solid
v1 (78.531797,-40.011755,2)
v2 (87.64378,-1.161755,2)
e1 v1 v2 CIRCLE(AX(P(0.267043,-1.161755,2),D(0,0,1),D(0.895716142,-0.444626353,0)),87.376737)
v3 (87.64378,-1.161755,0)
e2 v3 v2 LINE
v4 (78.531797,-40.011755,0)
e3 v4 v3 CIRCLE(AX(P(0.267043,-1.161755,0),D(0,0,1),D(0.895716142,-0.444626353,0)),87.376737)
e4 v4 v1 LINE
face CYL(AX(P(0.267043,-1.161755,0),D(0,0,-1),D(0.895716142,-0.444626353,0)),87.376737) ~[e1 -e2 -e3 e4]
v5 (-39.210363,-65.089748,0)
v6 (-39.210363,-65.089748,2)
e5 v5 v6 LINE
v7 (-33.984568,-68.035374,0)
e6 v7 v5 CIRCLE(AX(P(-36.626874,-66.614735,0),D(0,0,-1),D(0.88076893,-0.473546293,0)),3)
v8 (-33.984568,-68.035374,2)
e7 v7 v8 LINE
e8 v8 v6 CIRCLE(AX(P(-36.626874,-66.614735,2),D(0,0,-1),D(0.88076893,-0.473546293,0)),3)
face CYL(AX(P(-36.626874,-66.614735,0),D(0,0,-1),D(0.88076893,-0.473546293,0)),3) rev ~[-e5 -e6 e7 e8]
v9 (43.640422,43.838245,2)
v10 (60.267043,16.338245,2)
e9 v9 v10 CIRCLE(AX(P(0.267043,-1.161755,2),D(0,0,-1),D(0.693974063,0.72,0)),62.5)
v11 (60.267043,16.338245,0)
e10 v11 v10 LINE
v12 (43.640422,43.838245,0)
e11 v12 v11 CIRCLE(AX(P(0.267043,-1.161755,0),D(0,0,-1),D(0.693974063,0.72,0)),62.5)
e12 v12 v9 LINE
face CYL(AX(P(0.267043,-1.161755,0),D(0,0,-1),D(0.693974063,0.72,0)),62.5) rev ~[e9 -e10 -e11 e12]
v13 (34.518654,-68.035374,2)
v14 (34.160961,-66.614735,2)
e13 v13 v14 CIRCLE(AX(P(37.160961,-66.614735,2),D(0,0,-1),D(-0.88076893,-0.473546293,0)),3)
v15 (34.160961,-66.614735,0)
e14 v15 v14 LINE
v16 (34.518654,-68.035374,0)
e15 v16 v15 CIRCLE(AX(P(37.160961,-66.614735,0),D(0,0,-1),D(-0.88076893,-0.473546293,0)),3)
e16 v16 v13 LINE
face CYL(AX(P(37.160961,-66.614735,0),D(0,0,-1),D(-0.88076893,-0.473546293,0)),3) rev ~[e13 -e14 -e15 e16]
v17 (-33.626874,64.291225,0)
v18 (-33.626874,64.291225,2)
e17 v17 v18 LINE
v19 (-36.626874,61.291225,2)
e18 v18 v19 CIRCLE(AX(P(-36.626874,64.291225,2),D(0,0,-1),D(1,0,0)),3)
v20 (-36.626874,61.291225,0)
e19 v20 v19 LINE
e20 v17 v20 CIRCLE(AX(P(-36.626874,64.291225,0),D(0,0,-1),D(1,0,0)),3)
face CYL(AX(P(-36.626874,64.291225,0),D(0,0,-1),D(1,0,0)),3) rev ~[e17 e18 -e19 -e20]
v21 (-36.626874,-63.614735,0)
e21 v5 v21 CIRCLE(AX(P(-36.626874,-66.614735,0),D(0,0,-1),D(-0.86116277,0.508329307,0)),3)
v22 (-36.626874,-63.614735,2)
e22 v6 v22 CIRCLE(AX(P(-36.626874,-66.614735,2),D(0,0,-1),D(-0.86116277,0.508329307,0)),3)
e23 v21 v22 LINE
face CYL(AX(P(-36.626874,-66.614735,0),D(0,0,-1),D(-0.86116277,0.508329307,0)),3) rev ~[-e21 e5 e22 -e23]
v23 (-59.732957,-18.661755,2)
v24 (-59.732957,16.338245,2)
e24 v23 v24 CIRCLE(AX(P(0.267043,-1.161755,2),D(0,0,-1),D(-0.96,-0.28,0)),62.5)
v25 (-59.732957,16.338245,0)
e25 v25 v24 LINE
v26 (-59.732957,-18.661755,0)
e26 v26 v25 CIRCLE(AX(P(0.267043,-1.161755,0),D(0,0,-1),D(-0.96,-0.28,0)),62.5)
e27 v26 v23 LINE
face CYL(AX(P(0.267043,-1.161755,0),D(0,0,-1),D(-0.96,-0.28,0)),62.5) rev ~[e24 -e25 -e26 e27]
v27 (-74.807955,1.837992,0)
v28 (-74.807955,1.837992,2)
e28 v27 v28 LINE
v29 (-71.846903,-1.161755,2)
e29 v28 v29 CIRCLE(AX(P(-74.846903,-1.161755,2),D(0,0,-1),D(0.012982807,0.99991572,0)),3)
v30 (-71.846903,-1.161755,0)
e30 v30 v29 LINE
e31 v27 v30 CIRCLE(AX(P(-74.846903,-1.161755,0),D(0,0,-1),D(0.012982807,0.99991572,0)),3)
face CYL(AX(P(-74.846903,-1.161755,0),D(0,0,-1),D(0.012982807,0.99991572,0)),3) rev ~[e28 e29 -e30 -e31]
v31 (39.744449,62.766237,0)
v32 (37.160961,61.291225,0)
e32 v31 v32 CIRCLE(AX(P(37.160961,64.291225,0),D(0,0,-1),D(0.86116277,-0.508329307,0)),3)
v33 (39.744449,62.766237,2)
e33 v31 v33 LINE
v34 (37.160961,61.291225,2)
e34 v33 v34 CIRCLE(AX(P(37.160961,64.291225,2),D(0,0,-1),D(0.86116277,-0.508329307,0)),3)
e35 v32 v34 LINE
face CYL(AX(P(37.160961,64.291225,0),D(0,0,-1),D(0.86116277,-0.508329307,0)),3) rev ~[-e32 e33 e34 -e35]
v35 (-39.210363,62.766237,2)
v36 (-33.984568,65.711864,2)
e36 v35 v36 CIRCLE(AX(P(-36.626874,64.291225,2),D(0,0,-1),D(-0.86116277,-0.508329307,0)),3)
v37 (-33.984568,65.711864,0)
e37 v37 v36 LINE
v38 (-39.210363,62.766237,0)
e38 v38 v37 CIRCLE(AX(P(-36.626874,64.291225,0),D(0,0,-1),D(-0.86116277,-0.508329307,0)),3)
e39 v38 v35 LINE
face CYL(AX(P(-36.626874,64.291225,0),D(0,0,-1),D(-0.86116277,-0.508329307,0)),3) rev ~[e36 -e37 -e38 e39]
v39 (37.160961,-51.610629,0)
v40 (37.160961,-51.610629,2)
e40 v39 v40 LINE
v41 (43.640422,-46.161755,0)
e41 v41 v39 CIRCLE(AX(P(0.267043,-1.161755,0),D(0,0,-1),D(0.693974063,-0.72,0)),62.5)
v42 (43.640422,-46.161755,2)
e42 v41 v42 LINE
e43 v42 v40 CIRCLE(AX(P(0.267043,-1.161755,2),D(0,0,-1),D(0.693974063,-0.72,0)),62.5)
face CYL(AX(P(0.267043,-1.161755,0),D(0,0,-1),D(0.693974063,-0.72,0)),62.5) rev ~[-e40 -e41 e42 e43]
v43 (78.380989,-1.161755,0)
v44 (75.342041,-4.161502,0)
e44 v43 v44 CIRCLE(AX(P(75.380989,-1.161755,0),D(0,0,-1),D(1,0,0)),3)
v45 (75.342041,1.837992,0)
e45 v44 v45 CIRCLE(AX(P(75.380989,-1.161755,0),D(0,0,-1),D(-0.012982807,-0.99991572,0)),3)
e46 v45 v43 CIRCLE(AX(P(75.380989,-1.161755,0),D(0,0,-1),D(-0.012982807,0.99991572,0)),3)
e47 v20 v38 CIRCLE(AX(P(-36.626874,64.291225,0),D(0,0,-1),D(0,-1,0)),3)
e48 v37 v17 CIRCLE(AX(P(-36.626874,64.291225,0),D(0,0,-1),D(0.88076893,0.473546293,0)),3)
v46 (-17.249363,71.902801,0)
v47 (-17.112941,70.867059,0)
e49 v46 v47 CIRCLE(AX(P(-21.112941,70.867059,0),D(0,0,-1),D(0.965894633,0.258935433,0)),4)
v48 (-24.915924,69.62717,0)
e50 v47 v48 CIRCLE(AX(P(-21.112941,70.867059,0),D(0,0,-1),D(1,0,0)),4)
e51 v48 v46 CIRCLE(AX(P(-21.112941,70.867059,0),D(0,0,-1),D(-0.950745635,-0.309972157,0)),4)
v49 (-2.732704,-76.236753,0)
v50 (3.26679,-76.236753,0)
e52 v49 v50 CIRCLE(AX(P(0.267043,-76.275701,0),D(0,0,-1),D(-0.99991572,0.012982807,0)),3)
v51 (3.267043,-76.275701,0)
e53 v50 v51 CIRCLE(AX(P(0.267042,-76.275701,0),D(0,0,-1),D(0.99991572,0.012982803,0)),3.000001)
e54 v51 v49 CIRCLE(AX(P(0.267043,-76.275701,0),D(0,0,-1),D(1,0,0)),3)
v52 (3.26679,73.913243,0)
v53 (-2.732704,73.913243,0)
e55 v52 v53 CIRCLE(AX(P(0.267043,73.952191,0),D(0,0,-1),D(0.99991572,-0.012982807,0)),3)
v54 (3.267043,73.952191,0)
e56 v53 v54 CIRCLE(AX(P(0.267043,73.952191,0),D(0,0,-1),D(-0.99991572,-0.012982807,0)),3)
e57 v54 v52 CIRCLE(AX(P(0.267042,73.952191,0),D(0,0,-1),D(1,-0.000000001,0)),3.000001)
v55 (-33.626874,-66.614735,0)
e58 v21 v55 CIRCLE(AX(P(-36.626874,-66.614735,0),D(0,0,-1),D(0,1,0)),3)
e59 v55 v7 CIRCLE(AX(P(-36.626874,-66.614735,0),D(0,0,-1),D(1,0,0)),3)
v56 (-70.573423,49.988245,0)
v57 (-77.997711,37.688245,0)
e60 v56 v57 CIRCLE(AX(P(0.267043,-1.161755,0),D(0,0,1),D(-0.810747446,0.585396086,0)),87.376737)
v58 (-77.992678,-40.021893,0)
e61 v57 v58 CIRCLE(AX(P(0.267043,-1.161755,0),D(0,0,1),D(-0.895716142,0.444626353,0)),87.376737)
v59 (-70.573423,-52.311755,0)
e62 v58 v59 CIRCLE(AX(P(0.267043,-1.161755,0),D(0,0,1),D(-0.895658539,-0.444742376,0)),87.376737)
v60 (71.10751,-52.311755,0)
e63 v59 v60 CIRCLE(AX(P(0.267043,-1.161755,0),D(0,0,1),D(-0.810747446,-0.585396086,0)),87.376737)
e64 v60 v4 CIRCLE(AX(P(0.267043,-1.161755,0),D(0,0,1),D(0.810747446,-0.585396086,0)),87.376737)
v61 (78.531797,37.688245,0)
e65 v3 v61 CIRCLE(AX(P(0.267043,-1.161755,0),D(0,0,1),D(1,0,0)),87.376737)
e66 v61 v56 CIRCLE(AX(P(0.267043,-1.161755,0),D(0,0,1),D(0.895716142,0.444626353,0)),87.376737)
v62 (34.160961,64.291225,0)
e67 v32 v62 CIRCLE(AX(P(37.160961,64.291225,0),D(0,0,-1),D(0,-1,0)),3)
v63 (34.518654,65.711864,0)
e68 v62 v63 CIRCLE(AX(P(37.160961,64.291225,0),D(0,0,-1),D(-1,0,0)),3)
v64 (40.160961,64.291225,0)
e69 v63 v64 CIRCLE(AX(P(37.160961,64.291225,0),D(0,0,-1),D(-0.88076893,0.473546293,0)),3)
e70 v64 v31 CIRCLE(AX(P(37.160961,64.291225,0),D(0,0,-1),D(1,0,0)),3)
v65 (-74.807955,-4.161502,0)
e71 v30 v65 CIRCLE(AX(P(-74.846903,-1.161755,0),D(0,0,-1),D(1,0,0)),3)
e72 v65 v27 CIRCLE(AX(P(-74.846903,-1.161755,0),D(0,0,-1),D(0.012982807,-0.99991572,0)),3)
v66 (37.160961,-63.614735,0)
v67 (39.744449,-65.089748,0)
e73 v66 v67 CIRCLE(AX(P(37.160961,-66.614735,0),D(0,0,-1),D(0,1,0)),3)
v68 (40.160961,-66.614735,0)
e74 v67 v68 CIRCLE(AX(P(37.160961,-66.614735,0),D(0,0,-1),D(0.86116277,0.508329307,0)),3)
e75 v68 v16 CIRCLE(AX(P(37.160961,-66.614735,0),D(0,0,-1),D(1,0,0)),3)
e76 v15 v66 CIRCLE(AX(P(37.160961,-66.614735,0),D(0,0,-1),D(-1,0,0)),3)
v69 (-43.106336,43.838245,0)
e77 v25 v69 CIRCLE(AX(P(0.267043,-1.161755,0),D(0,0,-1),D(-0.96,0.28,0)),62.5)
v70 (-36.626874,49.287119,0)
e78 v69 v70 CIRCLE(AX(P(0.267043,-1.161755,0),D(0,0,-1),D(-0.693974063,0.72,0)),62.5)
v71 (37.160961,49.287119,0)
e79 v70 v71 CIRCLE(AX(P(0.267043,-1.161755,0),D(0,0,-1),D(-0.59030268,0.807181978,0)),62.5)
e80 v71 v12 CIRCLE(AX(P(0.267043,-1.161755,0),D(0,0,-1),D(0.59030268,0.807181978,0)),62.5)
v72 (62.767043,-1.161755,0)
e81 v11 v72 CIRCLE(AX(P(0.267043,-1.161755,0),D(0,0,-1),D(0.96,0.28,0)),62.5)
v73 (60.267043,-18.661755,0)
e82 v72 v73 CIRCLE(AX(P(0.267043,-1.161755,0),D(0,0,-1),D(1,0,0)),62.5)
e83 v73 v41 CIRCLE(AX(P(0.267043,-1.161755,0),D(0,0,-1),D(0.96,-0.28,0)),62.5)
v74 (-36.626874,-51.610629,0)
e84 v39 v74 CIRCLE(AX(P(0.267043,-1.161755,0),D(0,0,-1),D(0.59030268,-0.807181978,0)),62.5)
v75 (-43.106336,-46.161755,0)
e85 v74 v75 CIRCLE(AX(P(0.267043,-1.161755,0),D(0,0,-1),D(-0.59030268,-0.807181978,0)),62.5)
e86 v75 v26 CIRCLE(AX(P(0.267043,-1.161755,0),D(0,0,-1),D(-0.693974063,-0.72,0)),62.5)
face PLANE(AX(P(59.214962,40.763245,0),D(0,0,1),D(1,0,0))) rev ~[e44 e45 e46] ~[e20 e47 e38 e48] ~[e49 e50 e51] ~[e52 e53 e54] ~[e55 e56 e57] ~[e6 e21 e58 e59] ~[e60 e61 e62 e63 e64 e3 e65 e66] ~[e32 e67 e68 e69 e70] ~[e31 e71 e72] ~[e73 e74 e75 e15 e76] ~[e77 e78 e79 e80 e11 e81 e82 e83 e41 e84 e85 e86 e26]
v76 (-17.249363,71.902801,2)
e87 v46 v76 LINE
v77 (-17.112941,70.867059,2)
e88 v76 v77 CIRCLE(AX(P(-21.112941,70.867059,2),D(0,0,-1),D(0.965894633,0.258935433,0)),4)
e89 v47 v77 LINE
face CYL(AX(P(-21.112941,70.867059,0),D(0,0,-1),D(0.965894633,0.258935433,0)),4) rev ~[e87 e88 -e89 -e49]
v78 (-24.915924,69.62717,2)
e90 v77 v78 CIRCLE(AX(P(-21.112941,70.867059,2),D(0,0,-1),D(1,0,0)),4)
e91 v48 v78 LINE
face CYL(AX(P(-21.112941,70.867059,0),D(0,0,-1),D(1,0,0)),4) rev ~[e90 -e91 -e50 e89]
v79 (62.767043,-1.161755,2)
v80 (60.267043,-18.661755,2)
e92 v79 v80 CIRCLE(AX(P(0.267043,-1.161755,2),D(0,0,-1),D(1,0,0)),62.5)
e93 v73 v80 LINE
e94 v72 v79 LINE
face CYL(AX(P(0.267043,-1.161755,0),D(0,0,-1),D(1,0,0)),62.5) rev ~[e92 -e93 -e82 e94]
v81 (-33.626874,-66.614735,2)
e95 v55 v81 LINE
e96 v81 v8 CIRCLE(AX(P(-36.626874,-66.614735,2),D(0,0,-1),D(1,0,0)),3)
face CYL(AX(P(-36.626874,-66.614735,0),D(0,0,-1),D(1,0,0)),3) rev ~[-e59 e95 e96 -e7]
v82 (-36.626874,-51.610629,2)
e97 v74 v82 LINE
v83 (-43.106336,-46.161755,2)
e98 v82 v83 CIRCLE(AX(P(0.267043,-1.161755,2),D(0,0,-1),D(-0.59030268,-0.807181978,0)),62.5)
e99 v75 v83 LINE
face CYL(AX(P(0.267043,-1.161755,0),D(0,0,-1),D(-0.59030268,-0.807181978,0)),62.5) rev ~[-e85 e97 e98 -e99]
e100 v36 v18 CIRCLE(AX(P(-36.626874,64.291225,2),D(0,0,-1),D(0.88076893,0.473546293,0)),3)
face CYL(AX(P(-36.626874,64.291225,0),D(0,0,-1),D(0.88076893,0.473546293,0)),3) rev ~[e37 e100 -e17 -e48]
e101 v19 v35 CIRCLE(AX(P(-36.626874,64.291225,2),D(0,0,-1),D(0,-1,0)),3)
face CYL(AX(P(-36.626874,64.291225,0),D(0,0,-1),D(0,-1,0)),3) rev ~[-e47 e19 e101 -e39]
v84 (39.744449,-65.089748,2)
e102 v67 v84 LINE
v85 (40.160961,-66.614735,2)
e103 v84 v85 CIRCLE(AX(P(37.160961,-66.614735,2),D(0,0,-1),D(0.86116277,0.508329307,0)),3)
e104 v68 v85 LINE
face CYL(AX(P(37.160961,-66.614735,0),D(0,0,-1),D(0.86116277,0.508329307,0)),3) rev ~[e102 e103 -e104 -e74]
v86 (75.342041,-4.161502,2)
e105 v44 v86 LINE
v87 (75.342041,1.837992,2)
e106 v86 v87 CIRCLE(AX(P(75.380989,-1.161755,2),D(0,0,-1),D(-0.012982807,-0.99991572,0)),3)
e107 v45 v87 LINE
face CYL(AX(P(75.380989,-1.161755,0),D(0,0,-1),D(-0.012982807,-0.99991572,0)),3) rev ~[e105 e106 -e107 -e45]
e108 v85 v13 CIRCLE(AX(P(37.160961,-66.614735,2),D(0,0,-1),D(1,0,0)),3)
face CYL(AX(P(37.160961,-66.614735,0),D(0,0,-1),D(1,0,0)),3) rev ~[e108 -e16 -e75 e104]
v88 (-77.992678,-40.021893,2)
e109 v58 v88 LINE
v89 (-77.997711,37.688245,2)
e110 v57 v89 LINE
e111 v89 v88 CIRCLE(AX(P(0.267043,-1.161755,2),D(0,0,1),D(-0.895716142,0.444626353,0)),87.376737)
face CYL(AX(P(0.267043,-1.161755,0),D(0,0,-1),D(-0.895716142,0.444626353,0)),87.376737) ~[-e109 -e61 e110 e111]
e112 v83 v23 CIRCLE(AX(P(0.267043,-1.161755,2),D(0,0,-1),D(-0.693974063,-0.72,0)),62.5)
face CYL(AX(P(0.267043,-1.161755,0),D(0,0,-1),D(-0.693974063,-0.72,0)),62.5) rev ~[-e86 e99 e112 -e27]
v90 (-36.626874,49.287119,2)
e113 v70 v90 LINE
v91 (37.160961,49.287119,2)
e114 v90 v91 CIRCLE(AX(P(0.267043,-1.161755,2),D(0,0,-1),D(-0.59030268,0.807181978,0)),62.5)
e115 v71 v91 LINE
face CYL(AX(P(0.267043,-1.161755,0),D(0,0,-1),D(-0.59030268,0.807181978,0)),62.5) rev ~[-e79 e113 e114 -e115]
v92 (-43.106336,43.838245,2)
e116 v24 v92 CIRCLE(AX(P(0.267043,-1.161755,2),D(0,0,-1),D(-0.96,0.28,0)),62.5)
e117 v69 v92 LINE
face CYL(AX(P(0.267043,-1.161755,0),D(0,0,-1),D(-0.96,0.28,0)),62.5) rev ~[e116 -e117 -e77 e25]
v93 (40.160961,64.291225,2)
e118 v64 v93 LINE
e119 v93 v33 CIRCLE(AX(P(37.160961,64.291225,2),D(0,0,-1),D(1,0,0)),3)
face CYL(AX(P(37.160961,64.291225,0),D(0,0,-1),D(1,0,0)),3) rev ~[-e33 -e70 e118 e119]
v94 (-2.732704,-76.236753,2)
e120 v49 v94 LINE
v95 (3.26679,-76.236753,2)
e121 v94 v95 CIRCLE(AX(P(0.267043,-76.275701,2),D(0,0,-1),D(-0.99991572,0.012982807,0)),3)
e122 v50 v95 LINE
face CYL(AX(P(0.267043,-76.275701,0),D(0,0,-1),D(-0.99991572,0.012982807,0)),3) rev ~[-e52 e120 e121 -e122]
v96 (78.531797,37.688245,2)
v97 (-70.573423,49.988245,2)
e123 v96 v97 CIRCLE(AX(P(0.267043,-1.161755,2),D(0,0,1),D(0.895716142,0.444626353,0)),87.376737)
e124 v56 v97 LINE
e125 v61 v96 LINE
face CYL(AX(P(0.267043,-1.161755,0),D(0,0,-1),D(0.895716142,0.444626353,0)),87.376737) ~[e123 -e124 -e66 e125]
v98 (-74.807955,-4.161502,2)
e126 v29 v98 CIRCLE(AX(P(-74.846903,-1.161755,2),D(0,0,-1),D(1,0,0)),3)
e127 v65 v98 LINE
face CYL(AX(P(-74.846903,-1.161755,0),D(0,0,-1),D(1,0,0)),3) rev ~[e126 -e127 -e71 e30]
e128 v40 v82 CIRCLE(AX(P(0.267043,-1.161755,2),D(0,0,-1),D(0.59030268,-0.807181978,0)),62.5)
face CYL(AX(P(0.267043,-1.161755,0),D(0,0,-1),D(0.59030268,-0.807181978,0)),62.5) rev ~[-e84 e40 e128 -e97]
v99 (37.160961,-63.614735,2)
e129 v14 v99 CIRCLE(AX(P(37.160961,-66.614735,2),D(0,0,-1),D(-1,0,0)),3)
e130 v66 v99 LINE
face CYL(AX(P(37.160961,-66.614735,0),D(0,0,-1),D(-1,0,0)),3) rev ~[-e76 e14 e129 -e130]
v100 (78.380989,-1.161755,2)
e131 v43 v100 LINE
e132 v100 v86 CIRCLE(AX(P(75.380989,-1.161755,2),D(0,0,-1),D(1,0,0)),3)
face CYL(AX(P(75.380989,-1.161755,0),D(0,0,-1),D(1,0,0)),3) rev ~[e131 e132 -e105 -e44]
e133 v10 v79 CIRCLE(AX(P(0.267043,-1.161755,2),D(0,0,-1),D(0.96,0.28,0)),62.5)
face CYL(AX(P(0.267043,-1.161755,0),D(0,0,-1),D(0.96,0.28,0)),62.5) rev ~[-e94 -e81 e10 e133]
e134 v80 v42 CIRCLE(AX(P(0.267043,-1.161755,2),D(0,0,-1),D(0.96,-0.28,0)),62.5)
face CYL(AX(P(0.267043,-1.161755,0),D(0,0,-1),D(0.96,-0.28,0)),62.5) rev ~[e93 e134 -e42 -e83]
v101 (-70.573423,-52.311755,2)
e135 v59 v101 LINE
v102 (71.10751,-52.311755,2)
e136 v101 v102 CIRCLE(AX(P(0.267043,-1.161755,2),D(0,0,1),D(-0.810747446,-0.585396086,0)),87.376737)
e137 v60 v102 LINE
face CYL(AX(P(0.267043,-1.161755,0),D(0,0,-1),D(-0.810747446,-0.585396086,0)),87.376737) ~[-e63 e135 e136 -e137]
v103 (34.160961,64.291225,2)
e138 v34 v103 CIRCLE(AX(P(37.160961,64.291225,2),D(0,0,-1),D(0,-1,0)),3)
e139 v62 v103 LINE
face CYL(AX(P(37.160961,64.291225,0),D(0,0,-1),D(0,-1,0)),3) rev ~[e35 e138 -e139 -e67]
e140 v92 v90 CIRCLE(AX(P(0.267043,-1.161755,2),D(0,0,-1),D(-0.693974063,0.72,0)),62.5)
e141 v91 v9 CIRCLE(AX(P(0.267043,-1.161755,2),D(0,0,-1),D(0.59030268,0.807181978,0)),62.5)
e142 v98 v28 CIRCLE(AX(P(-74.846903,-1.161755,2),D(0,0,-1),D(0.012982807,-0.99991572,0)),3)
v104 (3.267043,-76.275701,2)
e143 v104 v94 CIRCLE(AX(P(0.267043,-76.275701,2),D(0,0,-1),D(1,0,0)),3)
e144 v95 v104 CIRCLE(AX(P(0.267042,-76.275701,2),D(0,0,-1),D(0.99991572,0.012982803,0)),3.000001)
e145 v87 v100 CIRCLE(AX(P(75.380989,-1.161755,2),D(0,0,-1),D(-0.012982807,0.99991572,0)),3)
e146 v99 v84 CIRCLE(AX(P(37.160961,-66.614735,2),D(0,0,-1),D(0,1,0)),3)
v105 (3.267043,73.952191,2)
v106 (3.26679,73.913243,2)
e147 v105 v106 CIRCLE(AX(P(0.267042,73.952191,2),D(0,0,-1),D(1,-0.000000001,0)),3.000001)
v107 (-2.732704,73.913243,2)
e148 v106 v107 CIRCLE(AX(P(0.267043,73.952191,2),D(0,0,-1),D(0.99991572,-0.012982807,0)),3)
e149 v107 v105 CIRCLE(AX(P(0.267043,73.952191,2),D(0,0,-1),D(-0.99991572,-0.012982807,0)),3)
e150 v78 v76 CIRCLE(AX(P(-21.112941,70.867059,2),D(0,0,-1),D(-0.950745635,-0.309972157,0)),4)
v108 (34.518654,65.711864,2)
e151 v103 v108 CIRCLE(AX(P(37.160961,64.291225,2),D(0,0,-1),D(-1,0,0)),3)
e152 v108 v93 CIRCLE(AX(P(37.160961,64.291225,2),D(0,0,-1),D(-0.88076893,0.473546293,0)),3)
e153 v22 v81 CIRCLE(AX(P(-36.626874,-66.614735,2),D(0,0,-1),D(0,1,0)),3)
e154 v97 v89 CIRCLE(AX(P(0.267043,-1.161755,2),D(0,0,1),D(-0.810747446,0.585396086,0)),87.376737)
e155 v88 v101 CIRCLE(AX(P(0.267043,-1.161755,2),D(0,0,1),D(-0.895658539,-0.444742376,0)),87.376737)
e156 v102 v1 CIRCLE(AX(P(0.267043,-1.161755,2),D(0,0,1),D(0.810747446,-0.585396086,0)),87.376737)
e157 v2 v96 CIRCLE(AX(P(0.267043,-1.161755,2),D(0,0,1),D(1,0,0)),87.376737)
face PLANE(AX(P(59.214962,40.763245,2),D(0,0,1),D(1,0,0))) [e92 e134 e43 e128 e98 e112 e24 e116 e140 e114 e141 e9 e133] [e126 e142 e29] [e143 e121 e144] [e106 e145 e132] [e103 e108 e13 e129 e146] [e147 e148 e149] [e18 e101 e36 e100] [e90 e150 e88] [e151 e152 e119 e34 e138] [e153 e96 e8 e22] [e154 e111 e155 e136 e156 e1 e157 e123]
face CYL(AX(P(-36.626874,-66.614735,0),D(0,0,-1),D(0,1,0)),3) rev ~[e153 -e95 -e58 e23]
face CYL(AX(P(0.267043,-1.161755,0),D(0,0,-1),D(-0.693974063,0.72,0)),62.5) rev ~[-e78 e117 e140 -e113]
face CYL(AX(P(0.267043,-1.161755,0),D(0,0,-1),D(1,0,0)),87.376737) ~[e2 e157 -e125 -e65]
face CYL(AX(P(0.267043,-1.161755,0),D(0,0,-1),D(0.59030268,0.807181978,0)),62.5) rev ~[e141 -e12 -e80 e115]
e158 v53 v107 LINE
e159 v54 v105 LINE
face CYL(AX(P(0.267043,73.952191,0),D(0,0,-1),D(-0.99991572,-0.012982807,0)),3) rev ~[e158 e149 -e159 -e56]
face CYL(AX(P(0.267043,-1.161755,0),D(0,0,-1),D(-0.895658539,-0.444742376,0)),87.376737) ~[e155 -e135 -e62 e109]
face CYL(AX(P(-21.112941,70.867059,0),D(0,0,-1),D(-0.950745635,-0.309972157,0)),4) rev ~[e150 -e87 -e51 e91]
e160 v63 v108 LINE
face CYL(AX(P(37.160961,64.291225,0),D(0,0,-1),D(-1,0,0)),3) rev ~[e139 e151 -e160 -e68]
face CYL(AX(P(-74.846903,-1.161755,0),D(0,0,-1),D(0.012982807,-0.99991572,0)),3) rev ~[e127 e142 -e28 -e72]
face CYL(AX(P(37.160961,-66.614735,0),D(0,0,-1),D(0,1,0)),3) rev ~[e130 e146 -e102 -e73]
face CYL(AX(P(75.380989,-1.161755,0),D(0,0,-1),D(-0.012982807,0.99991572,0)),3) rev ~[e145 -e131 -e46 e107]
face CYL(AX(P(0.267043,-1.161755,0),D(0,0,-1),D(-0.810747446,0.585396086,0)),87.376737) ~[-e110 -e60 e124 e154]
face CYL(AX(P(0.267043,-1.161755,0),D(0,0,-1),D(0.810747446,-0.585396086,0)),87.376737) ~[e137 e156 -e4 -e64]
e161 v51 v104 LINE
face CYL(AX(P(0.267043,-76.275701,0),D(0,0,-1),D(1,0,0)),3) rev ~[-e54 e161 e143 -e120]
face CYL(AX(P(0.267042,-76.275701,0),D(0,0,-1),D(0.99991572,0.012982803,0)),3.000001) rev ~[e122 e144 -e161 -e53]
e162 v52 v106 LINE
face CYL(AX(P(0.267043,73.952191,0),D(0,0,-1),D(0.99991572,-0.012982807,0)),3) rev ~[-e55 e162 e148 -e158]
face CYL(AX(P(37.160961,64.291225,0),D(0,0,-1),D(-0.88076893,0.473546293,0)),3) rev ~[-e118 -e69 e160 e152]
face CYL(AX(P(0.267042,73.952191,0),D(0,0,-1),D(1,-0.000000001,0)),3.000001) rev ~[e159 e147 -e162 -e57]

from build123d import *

# Parameters (mm, degrees)
F0_W     = 2.1041625413
F0_H     = 6.15
F1_DEPTH = 2


# Not quite as in the source:
# - a feature names something its author has since deleted; it is built from what else it names


with BuildPart() as f1:
    # F0 (on Top) → F1 (new body)
    with BuildSketch(Plane.XY):
        with Locations((59.2149618303, 40.7632449339)):
            Rectangle(F0_W, F0_H)
        with BuildLine():
            Line((58.1628805597, 43.8382449339), (60.2670431009, 43.8382449339))
            Line((60.2670431009, 43.8382449339), (60.2670431009, 37.6882449339))
            Line((60.2670431009, 37.6882449339), (62.3712056422, 37.6882449339))
            Line((62.3712056422, 37.6882449339), (62.3712056422, 41.1268579364))
            ThreePointArc((62.3712056422, 41.1268579364), (60.3323424952, 43.9759631228), (58.1628805597, 46.7269262644))
            Line((58.1628805597, 46.7269262644), (58.1628805597, 43.8382449339))
        make_face()
        with BuildLine():
            Line((58.1628805597, 37.6882449339), (58.1628805597, 43.8382449339))
            Line((58.1628805597, 43.8382449339), (53.7670431009, 43.8382449339))
            ThreePointArc((53.7670431009, 43.8382449339), (54.9789878574, 40.0585000032), (58.1628805597, 37.6882449339))
        make_face()
        with BuildLine():
            Line((53.7670431009, 43.8382449339), (58.1628805597, 43.8382449339))
            Line((58.1628805597, 43.8382449339), (58.1628805597, 46.7269262644))
            ThreePointArc((58.1628805597, 46.7269262644), (57.217639487, 47.8472580426), (56.25072261, 48.9489366399))
            ThreePointArc((56.25072261, 48.9489366399), (54.4208441995, 46.6793641507), (53.7670431009, 43.8382449339))
        make_face()
        with BuildLine():
            Line((62.3712056422, 37.6882449339), (60.2670431009, 37.6882449339))
            Line((60.2670431009, 37.6882449339), (60.2670431009, 37.3382449339))
            ThreePointArc((60.2670431009, 37.3382449339), (61.3335795513, 37.4263419402), (62.3712056422, 37.6882449339))
        make_face()
        with BuildLine():
            Line((60.2670431009, 37.3382449339), (60.2670431009, 37.6882449339))
            Line((60.2670431009, 37.6882449339), (58.1628805597, 37.6882449339))
            ThreePointArc((58.1628805597, 37.6882449339), (59.2005066506, 37.4263419402), (60.2670431009, 37.3382449339))
        make_face()
        with BuildLine():
            ThreePointArc((58.1628805597, 37.6882449339), (54.9789878574, 40.0585000032), (53.7670431009, 43.8382449339))
            Line((53.7670431009, 43.8382449339), (43.6404220332, 43.8382449339))
            ThreePointArc((43.6404220332, 43.8382449339), (53.7513993929, 31.1751222109), (60.2670431009, 16.3382449339))
            Line((60.2670431009, 16.3382449339), (60.2670431009, 37.3382449339))
            ThreePointArc((60.2670431009, 37.3382449339), (59.2005066506, 37.4263419402), (58.1628805597, 37.6882449339))
        make_face()
        with BuildLine():
            Line((43.6404220332, 43.8382449339), (53.7670431009, 43.8382449339))
            ThreePointArc((53.7670431009, 43.8382449339), (54.4208441995, 46.6793641507), (56.25072261, 48.9489366399))
            ThreePointArc((56.25072261, 48.9489366399), (48.4949826486, 56.4517818988), (39.7444489138, 62.7662374325))
            ThreePointArc((39.7444489138, 62.7662374325), (38.6484141737, 61.6859457367), (37.1609606052, 61.2912253535))
            Line((37.1609606052, 61.2912253535), (37.1609606052, 49.2871185703))
            ThreePointArc((37.1609606052, 49.2871185703), (40.4930580078, 46.6725184699), (43.6404220332, 43.8382449339))
        make_face()
        with BuildLine():
            ThreePointArc((56.25072261, 48.9489366399), (57.217639487, 47.8472580426), (58.1628805597, 46.7269262644))
            Line((58.1628805597, 46.7269262644), (58.1628805597, 49.9882449339))
            ThreePointArc((58.1628805597, 49.9882449339), (57.1629943627, 49.5491889391), (56.25072261, 48.9489366399))
        make_face()
        with BuildLine():
            Line((58.1628805597, 49.9882449339), (58.1628805597, 46.7269262644))
            ThreePointArc((58.1628805597, 46.7269262644), (60.3323424952, 43.9759631228), (62.3712056422, 41.1268579364))
            Line((62.3712056422, 41.1268579364), (62.3712056422, 49.9882449339))
            Line((62.3712056422, 49.9882449339), (58.1628805597, 49.9882449339))
        make_face()
        with BuildLine():
            ThreePointArc((62.3712056422, 37.6882449339), (61.3335795513, 37.4263419402), (60.2670431009, 37.3382449339))
            Line((60.2670431009, 37.3382449339), (60.2670431009, 16.3382449339))
            ThreePointArc((60.2670431009, 16.3382449339), (62.1388864548, 7.6770796987), (62.7670431009, -1.1617550661))
            ThreePointArc((62.7670431009, -1.1617550661), (62.1388864548, -10.000589831), (60.2670431009, -18.6617550661))
            Line((60.2670431009, -18.6617550661), (60.2670431009, -39.6617550661))
            ThreePointArc((60.2670431009, -39.6617550661), (61.3335795513, -39.7498520725), (62.3712056422, -40.0117550661))
            Line((62.3712056422, -40.0117550661), (64.5782497031, -40.0117550661))
            ThreePointArc((64.5782497031, -40.0117550661), (72.228412317, -22.7676601657), (75.3420410137, -4.1615022256))
            ThreePointArc((75.3420410137, -4.1615022256), (72.3809894341, -1.1617550661), (75.3420410137, 1.8379920933))
            ThreePointArc((75.3420410137, 1.8379920933), (72.228412317, 20.4441500334), (64.5782497031, 37.6882449339))
            Line((64.5782497031, 37.6882449339), (62.3712056422, 37.6882449339))
        make_face()
        with BuildLine():
            Line((62.3712056422, 41.1268579364), (62.3712056422, 37.6882449339))
            ThreePointArc((62.3712056422, 37.6882449339), (63.2414617158, 38.0587264501), (64.0487374012, 38.5515835849))
            ThreePointArc((64.0487374012, 38.5515835849), (63.2231408809, 39.8477992712), (62.3712056422, 41.1268579364))
        make_face()
        with BuildLine():
            ThreePointArc((64.0487374012, 38.5515835849), (63.2414617158, 38.0587264501), (62.3712056422, 37.6882449339))
            Line((62.3712056422, 37.6882449339), (64.5782497031, 37.6882449339))
            ThreePointArc((64.5782497031, 37.6882449339), (64.3149482486, 38.1208064697), (64.0487374012, 38.5515835849))
        make_face()
        with BuildLine():
            ThreePointArc((39.7444489138, 62.7662374325), (48.4949826486, 56.4517818988), (56.25072261, 48.9489366399))
            ThreePointArc((56.25072261, 48.9489366399), (57.1629943627, 49.5491889391), (58.1628805597, 49.9882449339))
            ThreePointArc((58.1628805597, 49.9882449339), (60.2670431009, 50.3382449339), (62.3712056422, 49.9882449339))
            Line((62.3712056422, 49.9882449339), (71.1075096636, 49.9882449339))
            ThreePointArc((71.1075096636, 49.9882449339), (0.2670431009, 86.2149821287), (-70.5734234617, 49.9882449339))
            Line((-70.5734234617, 49.9882449339), (-61.8371194403, 49.9882449339))
            ThreePointArc((-61.8371194403, 49.9882449339), (-59.7329568991, 50.3382449339), (-57.6287943578, 49.9882449339))
            ThreePointArc((-57.6287943578, 49.9882449339), (-56.6289081608, 49.5491889391), (-55.7166364081, 48.9489366399))
            ThreePointArc((-55.7166364081, 48.9489366399), (-47.9608964467, 56.4517818988), (-39.210362712, 62.7662374325))
            ThreePointArc((-39.210362712, 62.7662374325), (-38.0999813971, 66.9046437634), (-33.9845676129, 65.7118642328))
            ThreePointArc((-33.9845676129, 65.7118642328), (-29.5146570092, 67.8187069008), (-24.9159238599, 69.6271704072))
            ThreePointArc((-24.9159238599, 69.6271704072), (-22.2511598208, 74.7016983457), (-17.2493627904, 71.9028007682))
            ThreePointArc((-17.2493627904, 71.9028007682), (-10.040168129, 73.2628053376), (-2.7327040585, 73.9132428466))
            ThreePointArc((-2.7327040585, 73.9132428466), (0.2475684804, 76.9521280563), (3.2670431009, 73.9521912671))
            ThreePointArc((3.2670431009, 73.9521912671), (3.2669798901, 73.9327166465), (3.2667902604, 73.9132428466))
            ThreePointArc((3.2667902604, 73.9132428466), (19.3387910188, 71.5123271502), (34.5186538148, 65.7118642328))
            ThreePointArc((34.5186538148, 65.7118642328), (37.8934493863, 67.2004280253), (40.1609606052, 64.2912253535))
            ThreePointArc((40.1609606052, 64.2912253535), (40.0549599941, 63.5008029746), (39.7444489138, 62.7662374325))
        make_face()
        with BuildLine():
            ThreePointArc((62.3712056422, 49.9882449339), (60.2670431009, 50.3382449339), (58.1628805597, 49.9882449339))
            Line((58.1628805597, 49.9882449339), (62.3712056422, 49.9882449339))
        make_face()
        with BuildLine():
            Line((62.3712056422, 49.9882449339), (62.3712056422, 41.1268579364))
            ThreePointArc((62.3712056422, 41.1268579364), (63.2231408809, 39.8477992712), (64.0487374012, 38.5515835849))
            ThreePointArc((64.0487374012, 38.5515835849), (66.0476578153, 40.8659573428), (66.7670431009, 43.8382449339))
            ThreePointArc((66.7670431009, 43.8382449339), (65.5550983445, 47.6179898645), (62.3712056422, 49.9882449339))
        make_face()
        with BuildLine():
            ThreePointArc((66.7670431009, 43.8382449339), (66.0476578153, 40.8659573428), (64.0487374012, 38.5515835849))
            ThreePointArc((64.0487374012, 38.5515835849), (64.3149482486, 38.1208064697), (64.5782497031, 37.6882449339))
            Line((64.5782497031, 37.6882449339), (78.5317969996, 37.6882449339))
            ThreePointArc((78.5317969996, 37.6882449339), (75.0728864035, 43.9910965671), (71.1075096636, 49.9882449339))
            Line((71.1075096636, 49.9882449339), (62.3712056422, 49.9882449339))
            ThreePointArc((62.3712056422, 49.9882449339), (65.5550983445, 47.6179898645), (66.7670431009, 43.8382449339))
        make_face()
        with BuildLine():
            Line((78.5317969996, 37.6882449339), (64.5782497031, 37.6882449339))
            ThreePointArc((64.5782497031, 37.6882449339), (72.228412317, 20.4441500334), (75.3420410137, 1.8379920933))
            ThreePointArc((75.3420410137, 1.8379920933), (77.4884944447, 0.9732912169), (78.3809894341, -1.1617550661))
            ThreePointArc((78.3809894341, -1.1617550661), (77.4884944447, -3.2968013492), (75.3420410137, -4.1615022256))
            ThreePointArc((75.3420410137, -4.1615022256), (72.228412317, -22.7676601657), (64.5782497031, -40.0117550661))
            Line((64.5782497031, -40.0117550661), (78.5317969996, -40.0117550661))
            ThreePointArc((78.5317969996, -40.0117550661), (85.3352893384, -21.1138899118), (87.6437802958, -1.1617550661))
            ThreePointArc((87.6437802958, -1.1617550661), (85.3352893384, 18.7903797795), (78.5317969996, 37.6882449339))
        make_face()
        with BuildLine():
            ThreePointArc((-36.6268744033, 49.2871185703), (0.2670431009, 61.3382449339), (37.1609606052, 49.2871185703))
            Line((37.1609606052, 49.2871185703), (37.1609606052, 61.2912253535))
            ThreePointArc((37.1609606052, 61.2912253535), (35.0396402617, 62.1699050099), (34.1609606052, 64.2912253535))
            Line((34.1609606052, 64.2912253535), (-33.6268744033, 64.2912253535))
            ThreePointArc((-33.6268744033, 64.2912253535), (-34.5055540598, 62.1699050099), (-36.6268744033, 61.2912253535))
            Line((-36.6268744033, 61.2912253535), (-36.6268744033, 49.2871185703))
        make_face()
        with BuildLine():
            Line((60.2670431009, -39.6617550661), (60.2670431009, -18.6617550661))
            ThreePointArc((60.2670431009, -18.6617550661), (53.7513993929, -33.4986323432), (43.6404220332, -46.1617550661))
            Line((43.6404220332, -46.1617550661), (53.7670431009, -46.1617550661))
            ThreePointArc((53.7670431009, -46.1617550661), (54.9789878574, -42.3820101355), (58.1628805597, -40.0117550661))
            ThreePointArc((58.1628805597, -40.0117550661), (59.2005066506, -39.7498520725), (60.2670431009, -39.6617550661))
        make_face()
        with BuildLine():
            ThreePointArc((-43.1063358313, 43.8382449339), (-39.9589718059, 46.6725184699), (-36.6268744033, 49.2871185703))
            Line((-36.6268744033, 49.2871185703), (-36.6268744033, 61.2912253535))
            ThreePointArc((-36.6268744033, 61.2912253535), (-38.1143279719, 61.6859457367), (-39.210362712, 62.7662374325))
            ThreePointArc((-39.210362712, 62.7662374325), (-47.9608964467, 56.4517818988), (-55.7166364081, 48.9489366399))
            ThreePointArc((-55.7166364081, 48.9489366399), (-53.8867579976, 46.6793641507), (-53.2329568991, 43.8382449339))
            Line((-53.2329568991, 43.8382449339), (-43.1063358313, 43.8382449339))
        make_face()
        with BuildLine():
            ThreePointArc((62.3712056422, -40.0117550661), (61.3335795513, -39.7498520725), (60.2670431009, -39.6617550661))
            Line((60.2670431009, -39.6617550661), (60.2670431009, -40.0117550661))
            Line((60.2670431009, -40.0117550661), (62.3712056422, -40.0117550661))
        make_face()
        with BuildLine():
            Line((60.2670431009, -40.0117550661), (60.2670431009, -39.6617550661))
            ThreePointArc((60.2670431009, -39.6617550661), (59.2005066506, -39.7498520725), (58.1628805597, -40.0117550661))
            Line((58.1628805597, -40.0117550661), (60.2670431009, -40.0117550661))
        make_face()
        with BuildLine():
            Line((53.7670431009, -46.1617550661), (43.6404220332, -46.1617550661))
            ThreePointArc((43.6404220332, -46.1617550661), (40.4930580078, -48.9960286021), (37.1609606052, -51.6106287026))
            Line((37.1609606052, -51.6106287026), (37.1609606052, -63.6147354858))
            ThreePointArc((37.1609606052, -63.6147354858), (38.6484141737, -64.009455869), (39.7444489138, -65.0897475648))
            ThreePointArc((39.7444489138, -65.0897475648), (48.4949826486, -58.7752920311), (56.25072261, -51.2724467721))
            ThreePointArc((56.25072261, -51.2724467721), (54.4208441995, -49.002874283), (53.7670431009, -46.1617550661))
        make_face()
        with BuildLine():
            ThreePointArc((-59.7329568991, 16.3382449339), (-53.217313191, 31.1751222109), (-43.1063358313, 43.8382449339))
            Line((-43.1063358313, 43.8382449339), (-53.2329568991, 43.8382449339))
            ThreePointArc((-53.2329568991, 43.8382449339), (-54.4449016555, 40.0585000032), (-57.6287943578, 37.6882449339))
            ThreePointArc((-57.6287943578, 37.6882449339), (-58.6664204487, 37.4263419402), (-59.7329568991, 37.3382449339))
            Line((-59.7329568991, 37.3382449339), (-59.7329568991, 16.3382449339))
        make_face()
        with BuildLine():
            Line((37.1609606052, -63.6147354858), (37.1609606052, -51.6106287026))
            ThreePointArc((37.1609606052, -51.6106287026), (0.2670431009, -63.6617550661), (-36.6268744033, -51.6106287026))
            Line((-36.6268744033, -51.6106287026), (-36.6268744033, -63.6147354858))
            ThreePointArc((-36.6268744033, -63.6147354858), (-34.5055540598, -64.4934151422), (-33.6268744033, -66.6147354858))
            Line((-33.6268744033, -66.6147354858), (34.1609606052, -66.6147354858))
            ThreePointArc((34.1609606052, -66.6147354858), (35.0396402617, -64.4934151422), (37.1609606052, -63.6147354858))
        make_face()
        with BuildLine():
            Line((-33.6268744033, 64.2912253535), (34.1609606052, 64.2912253535))
            ThreePointArc((34.1609606052, 64.2912253535), (34.2517579334, 65.0237141345), (34.5186538148, 65.7118642328))
            ThreePointArc((34.5186538148, 65.7118642328), (19.3387910188, 71.5123271502), (3.2667902604, 73.9132428466))
            ThreePointArc((3.2667902604, 73.9132428466), (0.2670431009, 70.9521912671), (-2.7327040585, 73.9132428466))
            ThreePointArc((-2.7327040585, 73.9132428466), (-10.040168129, 73.2628053376), (-17.2493627904, 71.9028007682))
            ThreePointArc((-17.2493627904, 71.9028007682), (-17.1471933384, 71.3894027327), (-17.1129413209, 70.8670590345))
            ThreePointArc((-17.1129413209, 70.8670590345), (-20.4852193108, 66.9166204414), (-24.9159238599, 69.6271704072))
            ThreePointArc((-24.9159238599, 69.6271704072), (-29.5146570092, 67.8187069008), (-33.9845676129, 65.7118642328))
            ThreePointArc((-33.9845676129, 65.7118642328), (-33.7176717315, 65.0237141345), (-33.6268744033, 64.2912253535))
        make_face()
        with BuildLine():
            Line((-61.8371194403, 49.9882449339), (-70.5734234617, 49.9882449339))
            ThreePointArc((-70.5734234617, 49.9882449339), (-74.5388002016, 43.9910965671), (-77.9977107977, 37.6882449339))
            Line((-77.9977107977, 37.6882449339), (-64.0441635012, 37.6882449339))
            ThreePointArc((-64.0441635012, 37.6882449339), (-63.7808620468, 38.1208064697), (-63.5146511994, 38.5515835849))
            ThreePointArc((-63.5146511994, 38.5515835849), (-66.1641413462, 44.7815723464), (-61.8371194403, 49.9882449339))
        make_face()
        with BuildLine():
            Line((62.3712056422, -40.0117550661), (60.2670431009, -40.0117550661))
            Line((60.2670431009, -40.0117550661), (60.2670431009, -46.1617550661))
            Line((60.2670431009, -46.1617550661), (58.1628805597, -46.1617550661))
            Line((58.1628805597, -46.1617550661), (58.1628805597, -49.0504363967))
            ThreePointArc((58.1628805597, -49.0504363967), (60.3323424952, -46.2994732551), (62.3712056422, -43.4503680686))
            Line((62.3712056422, -43.4503680686), (62.3712056422, -40.0117550661))
        make_face()
        with Locations((59.2149618303, -43.0867550661)):
            Rectangle(F0_W, F0_H)
        with BuildLine():
            Line((64.5782497031, -40.0117550661), (62.3712056422, -40.0117550661))
            ThreePointArc((62.3712056422, -40.0117550661), (63.2414617158, -40.3822365824), (64.0487374012, -40.8750937171))
            ThreePointArc((64.0487374012, -40.8750937171), (64.3149482486, -40.444316602), (64.5782497031, -40.0117550661))
        make_face()
        with BuildLine():
            ThreePointArc((64.0487374012, -40.8750937171), (63.2414617158, -40.3822365824), (62.3712056422, -40.0117550661))
            Line((62.3712056422, -40.0117550661), (62.3712056422, -43.4503680686))
            ThreePointArc((62.3712056422, -43.4503680686), (63.2231408809, -42.1713094035), (64.0487374012, -40.8750937171))
        make_face()
        with BuildLine():
            Line((58.1628805597, -46.1617550661), (58.1628805597, -40.0117550661))
            ThreePointArc((58.1628805597, -40.0117550661), (54.9789878574, -42.3820101355), (53.7670431009, -46.1617550661))
            Line((53.7670431009, -46.1617550661), (58.1628805597, -46.1617550661))
        make_face()
        with BuildLine():
            Line((58.1628805597, -46.1617550661), (53.7670431009, -46.1617550661))
            ThreePointArc((53.7670431009, -46.1617550661), (54.4208441995, -49.002874283), (56.25072261, -51.2724467721))
            ThreePointArc((56.25072261, -51.2724467721), (57.217639487, -50.1707681749), (58.1628805597, -49.0504363967))
            Line((58.1628805597, -49.0504363967), (58.1628805597, -46.1617550661))
        make_face()
        with BuildLine():
            ThreePointArc((71.1075096636, -52.3117550661), (75.0728864035, -46.3146066994), (78.5317969996, -40.0117550661))
            Line((78.5317969996, -40.0117550661), (64.5782497031, -40.0117550661))
            ThreePointArc((64.5782497031, -40.0117550661), (64.3149482486, -40.444316602), (64.0487374012, -40.8750937171))
            ThreePointArc((64.0487374012, -40.8750937171), (66.0476578153, -43.1894674751), (66.7670431009, -46.1617550661))
            ThreePointArc((66.7670431009, -46.1617550661), (65.5550983445, -49.9414999968), (62.3712056422, -52.3117550661))
            Line((62.3712056422, -52.3117550661), (71.1075096636, -52.3117550661))
        make_face()
        with BuildLine():
            ThreePointArc((-57.6287943578, 37.6882449339), (-54.4449016555, 40.0585000032), (-53.2329568991, 43.8382449339))
            Line((-53.2329568991, 43.8382449339), (-57.6287943578, 43.8382449339))
            Line((-57.6287943578, 43.8382449339), (-57.6287943578, 37.6882449339))
        make_face()
        with BuildLine():
            Line((-57.6287943578, 43.8382449339), (-53.2329568991, 43.8382449339))
            ThreePointArc((-53.2329568991, 43.8382449339), (-53.8867579976, 46.6793641507), (-55.7166364081, 48.9489366399))
            ThreePointArc((-55.7166364081, 48.9489366399), (-56.6835532851, 47.8472580426), (-57.6287943578, 46.7269262644))
            Line((-57.6287943578, 46.7269262644), (-57.6287943578, 43.8382449339))
        make_face()
        with BuildLine():
            ThreePointArc((-59.7329568991, -18.6617550661), (-62.2329568991, -1.1617550661), (-59.7329568991, 16.3382449339))
            Line((-59.7329568991, 16.3382449339), (-59.7329568991, 37.3382449339))
            ThreePointArc((-59.7329568991, 37.3382449339), (-60.7994933494, 37.4263419402), (-61.8371194403, 37.6882449339))
            Line((-61.8371194403, 37.6882449339), (-64.0441635012, 37.6882449339))
            ThreePointArc((-64.0441635012, 37.6882449339), (-71.6943261151, 20.4441500334), (-74.8079548118, 1.8379920933))
            ThreePointArc((-74.8079548118, 1.8379920933), (-72.7118569492, 0.9457499444), (-71.8469032323, -1.1617550661))
            ThreePointArc((-71.8469032323, -1.1617550661), (-72.7118569492, -3.2692600767), (-74.8079548118, -4.1615022256))
            ThreePointArc((-74.8079548118, -4.1615022256), (-71.6943261151, -22.7676601657), (-64.0441635012, -40.0117550661))
            Line((-64.0441635012, -40.0117550661), (-61.8371194403, -40.0117550661))
            ThreePointArc((-61.8371194403, -40.0117550661), (-60.7994933494, -39.7498520725), (-59.7329568991, -39.6617550661))
            Line((-59.7329568991, -39.6617550661), (-59.7329568991, -18.6617550661))
        make_face()
        with BuildLine():
            ThreePointArc((-36.6268744033, -51.6106287026), (-39.9589718059, -48.9960286021), (-43.1063358313, -46.1617550661))
            Line((-43.1063358313, -46.1617550661), (-53.2329568991, -46.1617550661))
            ThreePointArc((-53.2329568991, -46.1617550661), (-53.8867579976, -49.002874283), (-55.7166364081, -51.2724467721))
            ThreePointArc((-55.7166364081, -51.2724467721), (-47.9608964467, -58.7752920311), (-39.210362712, -65.0897475648))
            ThreePointArc((-39.210362712, -65.0897475648), (-38.1143279719, -64.009455869), (-36.6268744033, -63.6147354858))
            Line((-36.6268744033, -63.6147354858), (-36.6268744033, -51.6106287026))
        make_face()
        with BuildLine():
            Line((-53.2329568991, -46.1617550661), (-43.1063358313, -46.1617550661))
            ThreePointArc((-43.1063358313, -46.1617550661), (-53.217313191, -33.4986323432), (-59.7329568991, -18.6617550661))
            Line((-59.7329568991, -18.6617550661), (-59.7329568991, -39.6617550661))
            ThreePointArc((-59.7329568991, -39.6617550661), (-58.6664204487, -39.7498520725), (-57.6287943578, -40.0117550661))
            ThreePointArc((-57.6287943578, -40.0117550661), (-54.4449016555, -42.3820101355), (-53.2329568991, -46.1617550661))
        make_face()
        with BuildLine():
            Line((-64.0441635012, 37.6882449339), (-77.9977107977, 37.6882449339))
            ThreePointArc((-77.9977107977, 37.6882449339), (-87.1096939106, -1.1674142446), (-77.9926777014, -40.0218927752))
            Line((-77.9926777014, -40.0218927752), (-77.9926777014, -40.0117550661))
            Line((-77.9926777014, -40.0117550661), (-64.0441635012, -40.0117550661))
            ThreePointArc((-64.0441635012, -40.0117550661), (-71.6943261151, -22.7676601657), (-74.8079548118, -4.1615022256))
            ThreePointArc((-74.8079548118, -4.1615022256), (-77.8469032323, -1.1617550661), (-74.8079548118, 1.8379920933))
            ThreePointArc((-74.8079548118, 1.8379920933), (-71.6943261151, 20.4441500334), (-64.0441635012, 37.6882449339))
        make_face()
        with BuildLine():
            Line((-61.8371194403, 41.1268579364), (-61.8371194403, 49.9882449339))
            ThreePointArc((-61.8371194403, 49.9882449339), (-66.1641413462, 44.7815723464), (-63.5146511994, 38.5515835849))
            ThreePointArc((-63.5146511994, 38.5515835849), (-62.689054679, 39.8477992712), (-61.8371194403, 41.1268579364))
        make_face()
        with BuildLine():
            ThreePointArc((-57.6287943578, 49.9882449339), (-59.7329568991, 50.3382449339), (-61.8371194403, 49.9882449339))
            Line((-61.8371194403, 49.9882449339), (-57.6287943578, 49.9882449339))
        make_face()
        with BuildLine():
            Line((-57.6287943578, 49.9882449339), (-61.8371194403, 49.9882449339))
            Line((-61.8371194403, 49.9882449339), (-61.8371194403, 41.1268579364))
            ThreePointArc((-61.8371194403, 41.1268579364), (-59.7982562933, 43.9759631228), (-57.6287943578, 46.7269262644))
            Line((-57.6287943578, 46.7269262644), (-57.6287943578, 49.9882449339))
        make_face()
        with BuildLine():
            ThreePointArc((66.7670431009, -46.1617550661), (66.0476578153, -43.1894674751), (64.0487374012, -40.8750937171))
            ThreePointArc((64.0487374012, -40.8750937171), (63.2231408809, -42.1713094035), (62.3712056422, -43.4503680686))
            Line((62.3712056422, -43.4503680686), (62.3712056422, -52.3117550661))
            ThreePointArc((62.3712056422, -52.3117550661), (65.5550983445, -49.9414999968), (66.7670431009, -46.1617550661))
        make_face()
        with BuildLine():
            Line((62.3712056422, -52.3117550661), (62.3712056422, -43.4503680686))
            ThreePointArc((62.3712056422, -43.4503680686), (60.3323424952, -46.2994732551), (58.1628805597, -49.0504363967))
            Line((58.1628805597, -49.0504363967), (58.1628805597, -52.3117550661))
            Line((58.1628805597, -52.3117550661), (62.3712056422, -52.3117550661))
        make_face()
        with BuildLine():
            ThreePointArc((58.1628805597, -49.0504363967), (57.217639487, -50.1707681749), (56.25072261, -51.2724467721))
            ThreePointArc((56.25072261, -51.2724467721), (57.1629943627, -51.8726990713), (58.1628805597, -52.3117550661))
            Line((58.1628805597, -52.3117550661), (58.1628805597, -49.0504363967))
        make_face()
        with BuildLine():
            ThreePointArc((58.1628805597, -52.3117550661), (57.1629943627, -51.8726990713), (56.25072261, -51.2724467721))
            ThreePointArc((56.25072261, -51.2724467721), (48.4949826486, -58.7752920311), (39.7444489138, -65.0897475648))
            ThreePointArc((39.7444489138, -65.0897475648), (40.0549599941, -65.8243131069), (40.1609606052, -66.6147354858))
            ThreePointArc((40.1609606052, -66.6147354858), (37.8934493863, -69.5239381576), (34.5186538148, -68.035374365))
            ThreePointArc((34.5186538148, -68.035374365), (19.3387910188, -73.8358372824), (3.2667902604, -76.2367529789))
            ThreePointArc((3.2667902604, -76.2367529789), (3.2669798901, -76.2562267788), (3.2670431009, -76.2757013993))
            ThreePointArc((3.2670431009, -76.2757013993), (0.2475684804, -79.2756381885), (-2.7327040585, -76.2367529789))
            ThreePointArc((-2.7327040585, -76.2367529789), (-18.8047048169, -73.8358372824), (-33.9845676129, -68.035374365))
            ThreePointArc((-33.9845676129, -68.035374365), (-38.0999813971, -69.2281538956), (-39.210362712, -65.0897475648))
            ThreePointArc((-39.210362712, -65.0897475648), (-47.9608964467, -58.7752920311), (-55.7166364081, -51.2724467721))
            ThreePointArc((-55.7166364081, -51.2724467721), (-56.6289081608, -51.8726990713), (-57.6287943578, -52.3117550661))
            ThreePointArc((-57.6287943578, -52.3117550661), (-59.7329568991, -52.6617550661), (-61.8371194403, -52.3117550661))
            Line((-61.8371194403, -52.3117550661), (-70.5734234617, -52.3117550661))
            ThreePointArc((-70.5734234617, -52.3117550661), (0.2670431009, -88.538492261), (71.1075096636, -52.3117550661))
            Line((71.1075096636, -52.3117550661), (62.3712056422, -52.3117550661))
            ThreePointArc((62.3712056422, -52.3117550661), (60.2670431009, -52.6617550661), (58.1628805597, -52.3117550661))
        make_face()
        with Locations((-58.6808756284, 40.7632449339)):
            Rectangle(F0_W, F0_H)
        with BuildLine():
            Line((-59.7329568991, 43.8382449339), (-57.6287943578, 43.8382449339))
            Line((-57.6287943578, 43.8382449339), (-57.6287943578, 46.7269262644))
            ThreePointArc((-57.6287943578, 46.7269262644), (-59.7982562933, 43.9759631228), (-61.8371194403, 41.1268579364))
            Line((-61.8371194403, 41.1268579364), (-61.8371194403, 37.6882449339))
            Line((-61.8371194403, 37.6882449339), (-59.7329568991, 37.6882449339))
            Line((-59.7329568991, 37.6882449339), (-59.7329568991, 43.8382449339))
        make_face()
        with BuildLine():
            ThreePointArc((-59.7329568991, 37.3382449339), (-58.6664204487, 37.4263419402), (-57.6287943578, 37.6882449339))
            Line((-57.6287943578, 37.6882449339), (-59.7329568991, 37.6882449339))
            Line((-59.7329568991, 37.6882449339), (-59.7329568991, 37.3382449339))
        make_face()
        with BuildLine():
            ThreePointArc((-57.6287943578, 46.7269262644), (-56.6835532851, 47.8472580426), (-55.7166364081, 48.9489366399))
            ThreePointArc((-55.7166364081, 48.9489366399), (-56.6289081608, 49.5491889391), (-57.6287943578, 49.9882449339))
            Line((-57.6287943578, 49.9882449339), (-57.6287943578, 46.7269262644))
        make_face()
        with BuildLine():
            ThreePointArc((-61.8371194403, 37.6882449339), (-60.7994933494, 37.4263419402), (-59.7329568991, 37.3382449339))
            Line((-59.7329568991, 37.3382449339), (-59.7329568991, 37.6882449339))
            Line((-59.7329568991, 37.6882449339), (-61.8371194403, 37.6882449339))
        make_face()
        with BuildLine():
            ThreePointArc((-55.7166364081, -51.2724467721), (-53.8867579976, -49.002874283), (-53.2329568991, -46.1617550661))
            Line((-53.2329568991, -46.1617550661), (-57.6287943578, -46.1617550661))
            Line((-57.6287943578, -46.1617550661), (-57.6287943578, -49.0504363967))
            ThreePointArc((-57.6287943578, -49.0504363967), (-56.6835532851, -50.1707681749), (-55.7166364081, -51.2724467721))
        make_face()
        with BuildLine():
            Line((-57.6287943578, -46.1617550661), (-53.2329568991, -46.1617550661))
            ThreePointArc((-53.2329568991, -46.1617550661), (-54.4449016555, -42.3820101355), (-57.6287943578, -40.0117550661))
            Line((-57.6287943578, -40.0117550661), (-57.6287943578, -46.1617550661))
        make_face()
        with BuildLine():
            ThreePointArc((34.5186538148, -68.035374365), (34.2517579334, -67.3472242668), (34.1609606052, -66.6147354858))
            Line((34.1609606052, -66.6147354858), (-33.6268744033, -66.6147354858))
            ThreePointArc((-33.6268744033, -66.6147354858), (-33.7176717315, -67.3472242668), (-33.9845676129, -68.035374365))
            ThreePointArc((-33.9845676129, -68.035374365), (-18.8047048169, -73.8358372824), (-2.7327040585, -76.2367529789))
            ThreePointArc((-2.7327040585, -76.2367529789), (0.2670431009, -73.2757013993), (3.2667902604, -76.2367529789))
            ThreePointArc((3.2667902604, -76.2367529789), (19.3387910188, -73.8358372824), (34.5186538148, -68.035374365))
        make_face()
        with BuildLine():
            Line((-77.9926777014, -40.0117550661), (-77.9926777014, -40.0218927752))
            ThreePointArc((-77.9926777014, -40.0218927752), (-74.5358756045, -46.3194515969), (-70.5734234617, -52.3117550661))
            Line((-70.5734234617, -52.3117550661), (-61.8371194403, -52.3117550661))
            ThreePointArc((-61.8371194403, -52.3117550661), (-66.1641413462, -47.1050824787), (-63.5146511994, -40.8750937171))
            ThreePointArc((-63.5146511994, -40.8750937171), (-63.7808620468, -40.444316602), (-64.0441635012, -40.0117550661))
            Line((-64.0441635012, -40.0117550661), (-77.9926777014, -40.0117550661))
        make_face()
        with BuildLine():
            ThreePointArc((-63.5146511994, 38.5515835849), (-63.7808620468, 38.1208064697), (-64.0441635012, 37.6882449339))
            Line((-64.0441635012, 37.6882449339), (-61.8371194403, 37.6882449339))
            ThreePointArc((-61.8371194403, 37.6882449339), (-62.7073755139, 38.0587264501), (-63.5146511994, 38.5515835849))
        make_face()
        with BuildLine():
            ThreePointArc((-61.8371194403, 41.1268579364), (-62.689054679, 39.8477992712), (-63.5146511994, 38.5515835849))
            ThreePointArc((-63.5146511994, 38.5515835849), (-62.7073755139, 38.0587264501), (-61.8371194403, 37.6882449339))
            Line((-61.8371194403, 37.6882449339), (-61.8371194403, 41.1268579364))
        make_face()
        with BuildLine():
            ThreePointArc((58.1628805597, -52.3117550661), (60.2670431009, -52.6617550661), (62.3712056422, -52.3117550661))
            Line((62.3712056422, -52.3117550661), (58.1628805597, -52.3117550661))
        make_face()
        with BuildLine():
            ThreePointArc((-57.6287943578, -40.0117550661), (-58.6664204487, -39.7498520725), (-59.7329568991, -39.6617550661))
            Line((-59.7329568991, -39.6617550661), (-59.7329568991, -40.0117550661))
            Line((-59.7329568991, -40.0117550661), (-57.6287943578, -40.0117550661))
        make_face()
        with BuildLine():
            Line((-59.7329568991, -40.0117550661), (-59.7329568991, -39.6617550661))
            ThreePointArc((-59.7329568991, -39.6617550661), (-60.7994933494, -39.7498520725), (-61.8371194403, -40.0117550661))
            Line((-61.8371194403, -40.0117550661), (-59.7329568991, -40.0117550661))
        make_face()
        with BuildLine():
            Line((-57.6287943578, -49.0504363967), (-57.6287943578, -46.1617550661))
            Line((-57.6287943578, -46.1617550661), (-59.7329568991, -46.1617550661))
            Line((-59.7329568991, -46.1617550661), (-59.7329568991, -40.0117550661))
            Line((-59.7329568991, -40.0117550661), (-61.8371194403, -40.0117550661))
            Line((-61.8371194403, -40.0117550661), (-61.8371194403, -43.4503680686))
            ThreePointArc((-61.8371194403, -43.4503680686), (-59.7982562933, -46.2994732551), (-57.6287943578, -49.0504363967))
        make_face()
        with Locations((-58.6808756284, -43.0867550661)):
            Rectangle(F0_W, F0_H)
        with BuildLine():
            ThreePointArc((-57.6287943578, -52.3117550661), (-56.6289081608, -51.8726990713), (-55.7166364081, -51.2724467721))
            ThreePointArc((-55.7166364081, -51.2724467721), (-56.6835532851, -50.1707681749), (-57.6287943578, -49.0504363967))
            Line((-57.6287943578, -49.0504363967), (-57.6287943578, -52.3117550661))
        make_face()
        with BuildLine():
            Line((-57.6287943578, -52.3117550661), (-61.8371194403, -52.3117550661))
            ThreePointArc((-61.8371194403, -52.3117550661), (-59.7329568991, -52.6617550661), (-57.6287943578, -52.3117550661))
        make_face()
        with BuildLine():
            Line((-61.8371194403, -43.4503680686), (-61.8371194403, -52.3117550661))
            Line((-61.8371194403, -52.3117550661), (-57.6287943578, -52.3117550661))
            Line((-57.6287943578, -52.3117550661), (-57.6287943578, -49.0504363967))
            ThreePointArc((-57.6287943578, -49.0504363967), (-59.7982562933, -46.2994732551), (-61.8371194403, -43.4503680686))
        make_face()
        with BuildLine():
            ThreePointArc((-63.5146511994, -40.8750937171), (-66.1641413462, -47.1050824787), (-61.8371194403, -52.3117550661))
            Line((-61.8371194403, -52.3117550661), (-61.8371194403, -43.4503680686))
            ThreePointArc((-61.8371194403, -43.4503680686), (-62.689054679, -42.1713094035), (-63.5146511994, -40.8750937171))
        make_face()
        with BuildLine():
            Line((-61.8371194403, -43.4503680686), (-61.8371194403, -40.0117550661))
            ThreePointArc((-61.8371194403, -40.0117550661), (-62.7073755139, -40.3822365824), (-63.5146511994, -40.8750937171))
            ThreePointArc((-63.5146511994, -40.8750937171), (-62.689054679, -42.1713094035), (-61.8371194403, -43.4503680686))
        make_face()
        with BuildLine():
            ThreePointArc((-63.5146511994, -40.8750937171), (-62.7073755139, -40.3822365824), (-61.8371194403, -40.0117550661))
            Line((-61.8371194403, -40.0117550661), (-64.0441635012, -40.0117550661))
            ThreePointArc((-64.0441635012, -40.0117550661), (-63.7808620468, -40.444316602), (-63.5146511994, -40.8750937171))
        make_face()
    extrude(amount=F1_DEPTH)


solid = f1.part
